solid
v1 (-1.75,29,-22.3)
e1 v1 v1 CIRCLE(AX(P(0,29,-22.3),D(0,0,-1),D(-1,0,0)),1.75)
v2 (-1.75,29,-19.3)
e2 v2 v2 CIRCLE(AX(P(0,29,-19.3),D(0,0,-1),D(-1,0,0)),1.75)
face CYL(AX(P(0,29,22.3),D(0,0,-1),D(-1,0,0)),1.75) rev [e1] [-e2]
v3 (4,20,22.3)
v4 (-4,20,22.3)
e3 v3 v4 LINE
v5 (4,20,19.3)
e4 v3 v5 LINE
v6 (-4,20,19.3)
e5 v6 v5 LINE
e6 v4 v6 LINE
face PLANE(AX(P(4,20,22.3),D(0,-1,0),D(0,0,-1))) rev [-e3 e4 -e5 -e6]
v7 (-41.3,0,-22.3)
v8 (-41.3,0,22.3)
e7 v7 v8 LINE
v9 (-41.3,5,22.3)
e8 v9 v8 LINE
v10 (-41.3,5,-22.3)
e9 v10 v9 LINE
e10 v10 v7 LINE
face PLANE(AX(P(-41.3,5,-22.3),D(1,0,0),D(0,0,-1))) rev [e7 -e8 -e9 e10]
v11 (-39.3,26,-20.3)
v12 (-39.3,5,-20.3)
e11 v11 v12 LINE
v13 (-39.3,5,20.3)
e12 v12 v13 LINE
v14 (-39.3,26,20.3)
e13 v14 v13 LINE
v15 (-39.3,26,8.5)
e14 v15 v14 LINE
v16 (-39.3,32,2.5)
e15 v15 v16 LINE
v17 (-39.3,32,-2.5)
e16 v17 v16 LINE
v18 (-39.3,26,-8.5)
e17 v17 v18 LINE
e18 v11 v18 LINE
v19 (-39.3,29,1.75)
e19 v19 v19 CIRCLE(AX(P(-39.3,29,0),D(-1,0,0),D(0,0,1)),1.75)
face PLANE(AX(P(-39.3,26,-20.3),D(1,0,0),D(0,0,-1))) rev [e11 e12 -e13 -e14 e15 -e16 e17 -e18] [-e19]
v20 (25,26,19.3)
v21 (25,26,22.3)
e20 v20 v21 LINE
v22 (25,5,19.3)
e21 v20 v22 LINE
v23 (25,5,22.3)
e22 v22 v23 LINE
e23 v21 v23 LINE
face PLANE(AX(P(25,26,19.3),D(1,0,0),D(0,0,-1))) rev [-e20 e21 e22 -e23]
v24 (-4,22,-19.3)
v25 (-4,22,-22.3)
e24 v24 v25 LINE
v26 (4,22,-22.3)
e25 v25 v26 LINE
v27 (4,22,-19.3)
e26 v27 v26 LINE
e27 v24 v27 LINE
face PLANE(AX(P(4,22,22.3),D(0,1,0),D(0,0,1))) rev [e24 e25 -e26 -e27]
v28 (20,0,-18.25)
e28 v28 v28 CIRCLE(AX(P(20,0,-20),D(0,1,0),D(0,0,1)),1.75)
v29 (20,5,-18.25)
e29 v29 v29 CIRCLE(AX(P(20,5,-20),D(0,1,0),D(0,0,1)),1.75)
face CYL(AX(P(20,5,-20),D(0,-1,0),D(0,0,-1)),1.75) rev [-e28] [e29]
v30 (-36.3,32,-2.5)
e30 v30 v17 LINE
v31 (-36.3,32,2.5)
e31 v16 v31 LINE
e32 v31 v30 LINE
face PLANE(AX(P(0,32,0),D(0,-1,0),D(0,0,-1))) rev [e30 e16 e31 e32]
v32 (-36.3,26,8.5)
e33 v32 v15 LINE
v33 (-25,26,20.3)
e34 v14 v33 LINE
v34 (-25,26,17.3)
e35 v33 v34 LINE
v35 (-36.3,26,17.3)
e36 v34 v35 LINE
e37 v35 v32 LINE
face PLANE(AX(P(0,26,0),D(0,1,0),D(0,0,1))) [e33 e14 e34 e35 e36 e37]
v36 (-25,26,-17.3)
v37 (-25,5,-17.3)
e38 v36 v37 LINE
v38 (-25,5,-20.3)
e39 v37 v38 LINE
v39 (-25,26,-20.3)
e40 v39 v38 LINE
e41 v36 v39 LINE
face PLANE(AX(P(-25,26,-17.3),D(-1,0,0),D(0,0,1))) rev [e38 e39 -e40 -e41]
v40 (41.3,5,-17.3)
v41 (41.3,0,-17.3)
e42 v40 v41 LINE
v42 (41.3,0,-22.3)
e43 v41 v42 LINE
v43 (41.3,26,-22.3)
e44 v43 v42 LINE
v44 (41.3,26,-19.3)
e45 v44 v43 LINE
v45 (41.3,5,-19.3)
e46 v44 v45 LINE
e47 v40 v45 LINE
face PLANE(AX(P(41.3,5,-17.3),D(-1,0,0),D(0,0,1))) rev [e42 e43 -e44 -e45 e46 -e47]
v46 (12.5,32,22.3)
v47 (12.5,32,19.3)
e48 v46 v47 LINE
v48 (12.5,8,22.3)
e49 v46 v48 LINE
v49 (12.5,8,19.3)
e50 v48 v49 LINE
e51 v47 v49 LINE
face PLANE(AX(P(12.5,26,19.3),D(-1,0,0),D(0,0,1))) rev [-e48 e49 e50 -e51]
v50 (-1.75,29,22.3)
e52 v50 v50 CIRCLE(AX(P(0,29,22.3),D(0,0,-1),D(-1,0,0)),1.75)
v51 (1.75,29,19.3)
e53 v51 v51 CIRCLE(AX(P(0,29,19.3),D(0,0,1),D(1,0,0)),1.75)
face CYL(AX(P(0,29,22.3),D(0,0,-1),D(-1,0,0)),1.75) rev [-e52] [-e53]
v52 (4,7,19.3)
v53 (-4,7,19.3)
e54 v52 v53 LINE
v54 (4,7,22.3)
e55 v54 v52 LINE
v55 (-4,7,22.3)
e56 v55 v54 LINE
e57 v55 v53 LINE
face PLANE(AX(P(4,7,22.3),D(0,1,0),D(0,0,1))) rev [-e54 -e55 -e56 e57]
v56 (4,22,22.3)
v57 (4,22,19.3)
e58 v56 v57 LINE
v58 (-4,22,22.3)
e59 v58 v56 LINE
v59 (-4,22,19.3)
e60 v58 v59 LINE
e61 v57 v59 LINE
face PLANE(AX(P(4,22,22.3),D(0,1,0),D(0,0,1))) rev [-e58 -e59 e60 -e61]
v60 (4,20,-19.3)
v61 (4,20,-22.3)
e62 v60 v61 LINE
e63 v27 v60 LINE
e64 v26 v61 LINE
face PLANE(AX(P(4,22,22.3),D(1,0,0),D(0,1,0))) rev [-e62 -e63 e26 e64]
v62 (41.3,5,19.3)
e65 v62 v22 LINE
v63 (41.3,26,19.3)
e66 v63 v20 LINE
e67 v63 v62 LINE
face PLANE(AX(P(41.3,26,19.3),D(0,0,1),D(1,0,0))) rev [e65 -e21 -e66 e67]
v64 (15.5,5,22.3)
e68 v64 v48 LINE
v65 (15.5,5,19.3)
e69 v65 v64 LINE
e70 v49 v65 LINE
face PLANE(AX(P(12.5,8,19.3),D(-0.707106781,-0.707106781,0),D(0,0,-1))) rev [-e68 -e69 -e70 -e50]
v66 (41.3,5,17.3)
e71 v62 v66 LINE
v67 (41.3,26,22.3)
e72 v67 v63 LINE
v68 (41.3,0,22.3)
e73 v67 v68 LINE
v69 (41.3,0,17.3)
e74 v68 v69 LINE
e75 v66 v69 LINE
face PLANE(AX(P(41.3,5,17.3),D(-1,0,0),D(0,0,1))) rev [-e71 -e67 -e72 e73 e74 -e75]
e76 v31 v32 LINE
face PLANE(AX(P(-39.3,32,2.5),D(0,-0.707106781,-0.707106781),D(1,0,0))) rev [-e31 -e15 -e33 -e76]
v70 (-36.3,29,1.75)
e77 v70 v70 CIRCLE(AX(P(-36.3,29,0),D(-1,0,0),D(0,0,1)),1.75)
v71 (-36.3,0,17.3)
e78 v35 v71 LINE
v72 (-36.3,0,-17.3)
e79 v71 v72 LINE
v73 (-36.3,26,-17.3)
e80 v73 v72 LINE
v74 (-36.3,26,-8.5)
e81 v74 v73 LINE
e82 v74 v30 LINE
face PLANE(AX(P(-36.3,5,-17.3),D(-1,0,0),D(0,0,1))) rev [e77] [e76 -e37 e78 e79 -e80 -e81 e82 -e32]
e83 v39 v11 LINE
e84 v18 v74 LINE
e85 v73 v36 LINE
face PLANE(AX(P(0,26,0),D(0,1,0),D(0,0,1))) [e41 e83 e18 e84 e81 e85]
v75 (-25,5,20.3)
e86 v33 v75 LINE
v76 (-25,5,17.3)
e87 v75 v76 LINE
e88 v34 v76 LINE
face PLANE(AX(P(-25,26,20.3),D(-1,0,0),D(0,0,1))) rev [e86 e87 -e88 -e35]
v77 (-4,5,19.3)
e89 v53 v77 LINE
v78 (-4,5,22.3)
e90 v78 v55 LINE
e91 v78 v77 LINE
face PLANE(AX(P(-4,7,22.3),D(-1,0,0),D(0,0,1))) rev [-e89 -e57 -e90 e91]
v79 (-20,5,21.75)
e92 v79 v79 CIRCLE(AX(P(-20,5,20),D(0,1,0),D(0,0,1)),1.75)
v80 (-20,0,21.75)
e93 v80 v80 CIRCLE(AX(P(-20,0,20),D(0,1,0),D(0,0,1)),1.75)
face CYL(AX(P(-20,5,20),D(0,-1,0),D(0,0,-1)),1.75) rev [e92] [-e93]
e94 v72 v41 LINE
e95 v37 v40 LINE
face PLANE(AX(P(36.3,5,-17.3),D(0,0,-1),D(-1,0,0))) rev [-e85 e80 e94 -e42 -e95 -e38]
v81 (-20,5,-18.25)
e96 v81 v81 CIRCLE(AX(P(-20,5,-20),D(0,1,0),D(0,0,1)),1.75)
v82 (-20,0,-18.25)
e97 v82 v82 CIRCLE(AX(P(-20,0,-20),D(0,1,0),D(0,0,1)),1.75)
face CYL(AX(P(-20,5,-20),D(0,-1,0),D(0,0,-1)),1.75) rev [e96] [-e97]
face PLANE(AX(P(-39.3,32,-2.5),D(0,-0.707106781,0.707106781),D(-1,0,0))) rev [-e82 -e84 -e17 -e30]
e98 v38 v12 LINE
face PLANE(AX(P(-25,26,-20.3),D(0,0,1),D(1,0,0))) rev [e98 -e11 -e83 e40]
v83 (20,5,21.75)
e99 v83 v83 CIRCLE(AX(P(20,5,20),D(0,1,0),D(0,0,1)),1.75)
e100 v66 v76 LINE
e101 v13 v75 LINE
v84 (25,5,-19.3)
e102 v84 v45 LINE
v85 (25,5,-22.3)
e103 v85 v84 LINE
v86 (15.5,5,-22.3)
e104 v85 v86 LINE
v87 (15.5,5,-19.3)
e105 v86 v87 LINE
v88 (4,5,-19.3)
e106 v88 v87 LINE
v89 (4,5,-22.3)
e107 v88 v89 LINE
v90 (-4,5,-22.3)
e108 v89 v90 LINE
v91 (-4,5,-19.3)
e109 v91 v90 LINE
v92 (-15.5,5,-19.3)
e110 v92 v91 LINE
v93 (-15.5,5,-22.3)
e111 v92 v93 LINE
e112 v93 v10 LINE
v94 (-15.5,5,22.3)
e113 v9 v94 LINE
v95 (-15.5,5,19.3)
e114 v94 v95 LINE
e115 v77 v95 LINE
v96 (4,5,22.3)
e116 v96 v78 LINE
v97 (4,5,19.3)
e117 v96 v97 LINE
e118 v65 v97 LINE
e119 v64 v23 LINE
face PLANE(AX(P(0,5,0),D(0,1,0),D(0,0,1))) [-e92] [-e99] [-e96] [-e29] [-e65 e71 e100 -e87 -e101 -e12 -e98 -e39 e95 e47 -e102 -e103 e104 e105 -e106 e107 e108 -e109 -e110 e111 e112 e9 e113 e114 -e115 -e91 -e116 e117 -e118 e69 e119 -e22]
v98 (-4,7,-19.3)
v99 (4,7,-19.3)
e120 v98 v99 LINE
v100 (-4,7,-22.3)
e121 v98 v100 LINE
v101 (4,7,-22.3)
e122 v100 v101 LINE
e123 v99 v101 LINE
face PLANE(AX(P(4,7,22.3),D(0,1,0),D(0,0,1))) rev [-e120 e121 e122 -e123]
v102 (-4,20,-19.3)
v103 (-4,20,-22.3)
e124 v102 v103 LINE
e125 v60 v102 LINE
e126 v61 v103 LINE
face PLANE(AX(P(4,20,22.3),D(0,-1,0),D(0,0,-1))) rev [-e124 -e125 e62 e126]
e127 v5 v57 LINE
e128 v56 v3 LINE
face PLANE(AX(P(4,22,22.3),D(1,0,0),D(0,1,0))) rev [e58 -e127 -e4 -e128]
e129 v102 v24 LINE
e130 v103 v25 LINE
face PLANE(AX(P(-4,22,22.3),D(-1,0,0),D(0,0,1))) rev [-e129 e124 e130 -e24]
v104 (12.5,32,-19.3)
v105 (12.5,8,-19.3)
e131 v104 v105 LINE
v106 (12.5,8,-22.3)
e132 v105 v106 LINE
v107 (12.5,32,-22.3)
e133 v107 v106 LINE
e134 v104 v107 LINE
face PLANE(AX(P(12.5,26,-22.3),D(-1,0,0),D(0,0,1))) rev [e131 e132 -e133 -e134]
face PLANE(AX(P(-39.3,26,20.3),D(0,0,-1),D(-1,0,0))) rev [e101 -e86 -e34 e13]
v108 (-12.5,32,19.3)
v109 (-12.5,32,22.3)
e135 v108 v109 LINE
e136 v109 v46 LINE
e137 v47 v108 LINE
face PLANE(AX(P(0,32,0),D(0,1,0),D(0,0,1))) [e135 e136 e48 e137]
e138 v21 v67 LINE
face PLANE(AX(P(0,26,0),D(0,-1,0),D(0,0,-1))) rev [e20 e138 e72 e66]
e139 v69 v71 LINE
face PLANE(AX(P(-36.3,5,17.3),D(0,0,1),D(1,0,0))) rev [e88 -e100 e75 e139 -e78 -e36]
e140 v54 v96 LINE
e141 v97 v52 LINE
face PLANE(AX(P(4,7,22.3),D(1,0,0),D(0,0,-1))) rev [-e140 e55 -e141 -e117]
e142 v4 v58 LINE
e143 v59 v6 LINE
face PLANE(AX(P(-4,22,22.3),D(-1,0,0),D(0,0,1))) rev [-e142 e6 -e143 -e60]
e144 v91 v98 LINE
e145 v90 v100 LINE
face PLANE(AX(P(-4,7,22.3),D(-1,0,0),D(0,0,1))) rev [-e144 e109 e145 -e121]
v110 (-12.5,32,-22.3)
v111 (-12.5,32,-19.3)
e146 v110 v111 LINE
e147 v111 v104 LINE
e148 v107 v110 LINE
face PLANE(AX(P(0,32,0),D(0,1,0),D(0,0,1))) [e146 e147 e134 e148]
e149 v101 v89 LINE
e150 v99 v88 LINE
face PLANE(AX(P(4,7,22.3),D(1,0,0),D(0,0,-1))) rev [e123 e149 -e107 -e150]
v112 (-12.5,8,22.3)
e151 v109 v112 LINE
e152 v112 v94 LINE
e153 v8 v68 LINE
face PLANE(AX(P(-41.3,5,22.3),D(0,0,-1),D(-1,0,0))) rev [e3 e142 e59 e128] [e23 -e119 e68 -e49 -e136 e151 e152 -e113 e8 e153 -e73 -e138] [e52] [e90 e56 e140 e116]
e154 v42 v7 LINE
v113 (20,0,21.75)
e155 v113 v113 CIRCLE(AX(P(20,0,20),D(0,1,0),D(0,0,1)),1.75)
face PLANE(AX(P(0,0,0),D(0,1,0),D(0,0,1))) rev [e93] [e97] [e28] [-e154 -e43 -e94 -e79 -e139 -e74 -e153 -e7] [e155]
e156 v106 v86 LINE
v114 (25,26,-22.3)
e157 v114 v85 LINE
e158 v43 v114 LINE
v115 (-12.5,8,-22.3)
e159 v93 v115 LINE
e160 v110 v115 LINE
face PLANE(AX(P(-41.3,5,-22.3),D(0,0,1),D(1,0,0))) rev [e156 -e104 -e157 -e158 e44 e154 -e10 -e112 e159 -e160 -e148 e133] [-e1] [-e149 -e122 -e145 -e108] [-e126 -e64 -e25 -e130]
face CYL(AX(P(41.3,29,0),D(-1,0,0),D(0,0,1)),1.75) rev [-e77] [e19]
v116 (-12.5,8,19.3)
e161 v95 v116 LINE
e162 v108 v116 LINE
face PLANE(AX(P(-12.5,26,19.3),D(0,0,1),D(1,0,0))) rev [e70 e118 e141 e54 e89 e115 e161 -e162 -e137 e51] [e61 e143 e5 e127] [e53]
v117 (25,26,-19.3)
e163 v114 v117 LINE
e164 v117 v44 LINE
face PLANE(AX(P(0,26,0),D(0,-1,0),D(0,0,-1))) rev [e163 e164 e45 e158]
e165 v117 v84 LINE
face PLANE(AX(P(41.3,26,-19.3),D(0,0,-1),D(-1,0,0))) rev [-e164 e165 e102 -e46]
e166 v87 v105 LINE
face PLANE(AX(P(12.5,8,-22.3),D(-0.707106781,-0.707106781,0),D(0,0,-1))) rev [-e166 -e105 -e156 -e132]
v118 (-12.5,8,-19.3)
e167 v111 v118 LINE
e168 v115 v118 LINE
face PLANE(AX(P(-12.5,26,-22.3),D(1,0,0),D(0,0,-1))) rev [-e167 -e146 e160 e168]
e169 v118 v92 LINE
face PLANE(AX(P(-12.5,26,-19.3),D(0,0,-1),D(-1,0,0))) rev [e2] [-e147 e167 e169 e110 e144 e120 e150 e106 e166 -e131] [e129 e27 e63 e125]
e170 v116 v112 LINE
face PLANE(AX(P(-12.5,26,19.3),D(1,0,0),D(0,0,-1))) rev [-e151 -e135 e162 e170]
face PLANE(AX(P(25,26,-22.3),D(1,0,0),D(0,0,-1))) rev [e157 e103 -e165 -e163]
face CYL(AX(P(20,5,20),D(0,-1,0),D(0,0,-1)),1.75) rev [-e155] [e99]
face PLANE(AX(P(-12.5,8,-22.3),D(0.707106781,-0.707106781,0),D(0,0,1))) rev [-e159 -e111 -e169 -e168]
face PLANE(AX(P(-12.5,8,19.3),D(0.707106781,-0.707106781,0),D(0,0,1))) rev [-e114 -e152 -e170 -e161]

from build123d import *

# Parameters (mm, degrees)
CROQUIS1_R              = 1.75
SALIENTE_EXTRUIR1_DEPTH = 5
CROQUIS2_W              = 25
CROQUIS2_H              = 3
CROQUIS2_W_2            = 16.3
SALIENTE_EXTRUIR2_DEPTH = 21
CROQUIS4_W              = 3
CROQUIS4_H              = 5
SALIENTE_EXTRUIR3_DEPTH = 6
CROQUIS5_R              = 1.75
CORTAR_EXTRUIR2_DEPTH   = 90.541331239
CHAFL_N1_SIZE           = 6
CROQUIS6_W              = 25
CROQUIS6_H              = 3
SALIENTE_EXTRUIR4_DEPTH = 6
CROQUIS7_R              = 1.75
CROQUIS7_W              = 8
CROQUIS7_H              = 2
CORTAR_EXTRUIR3_DEPTH   = 69.693886191
CHAFL_N2_SIZE           = 3


with BuildPart() as part:
    # Croquis1 → Saliente-Extruir1 (new body)
    with BuildSketch(Plane(origin=(0, 0, 0), x_dir=(1, 0, 0), z_dir=(0, 1, 0))):
        Polygon((-36.3, 17.3), (36.3, 17.3), (41.3, 17.3), (41.3, 22.3), (-41.3, 22.3), (-41.3, -22.3), (41.3, -22.3), (41.3, -17.3), (36.3, -17.3), (-36.3, -17.3), align=None)
        with Locations(Location((-20, 20, 0), (0, 0, 270))):
            Circle(CROQUIS1_R, mode=Mode.SUBTRACT)
        with Locations(Location((20, 20, 0), (0, 0, 270))):
            Circle(CROQUIS1_R, mode=Mode.SUBTRACT)
        with Locations(Location((-20, -20, 0), (0, 0, 270))):
            Circle(CROQUIS1_R, mode=Mode.SUBTRACT)
        with Locations(Location((20, -20, 0), (0, 0, 270))):
            Circle(CROQUIS1_R, mode=Mode.SUBTRACT)
    extrude(amount=SALIENTE_EXTRUIR1_DEPTH)

    # Croquis2 → Saliente-Extruir2 (add)
    with BuildSketch(Plane(origin=(0, 5, 0), x_dir=(1, 0, 0), z_dir=(0, 1, 0))):
        Polygon((-39.3, 20.3), (-39.3, -20.3), (-25, -20.3), (-25, -17.3), (-36.3, -17.3), (-36.3, 17.3), (-25, 17.3), (-25, 20.3), align=None)
        with Locations((0, -20.8)):
            Rectangle(CROQUIS2_W, CROQUIS2_H)
        with Locations((0, 20.8)):
            Rectangle(CROQUIS2_W, CROQUIS2_H)
        with Locations((33.15, -20.8)):
            Rectangle(CROQUIS2_W_2, CROQUIS2_H)
        with Locations((33.15, 20.8)):
            Rectangle(CROQUIS2_W_2, CROQUIS2_H)
    extrude(amount=SALIENTE_EXTRUIR2_DEPTH)

    # Croquis4 → Saliente-Extruir3 (add)
    with BuildSketch(Plane(origin=(0, 26, 0), x_dir=(1, 0, 0), z_dir=(0, 1, 0))):
        with Locations((-37.8, 0)):
            Rectangle(CROQUIS4_W, CROQUIS4_H)
    extrude(amount=SALIENTE_EXTRUIR3_DEPTH)

    # Croquis5 → Cortar-Extruir2 (cut, through all)
    with BuildSketch(Plane.ZY.offset(39.3)):
        with Locations((0, 29)):
            Circle(CROQUIS5_R)
    extrude(amount=-CORTAR_EXTRUIR2_DEPTH, mode=Mode.SUBTRACT)

    # Chaflán1
    chafl_n1_edges = [part.edges().sort_by_distance(p)[0] for p in [
        (-37.8, 26, 2.5),
        (-37.8, 26, -2.5),
    ]]
    chamfer(chafl_n1_edges, length=CHAFL_N1_SIZE - 0.0001)  # a hair under: the kernel refuses the full size

    # Croquis6 → Saliente-Extruir4 (add)
    with BuildSketch(Plane(origin=(0, 26, 0), x_dir=(1, 0, 0), z_dir=(0, 1, 0))):
        with Locations((0, 20.8)):
            Rectangle(CROQUIS6_W, CROQUIS6_H)
        with Locations((0, -20.8)):
            Rectangle(CROQUIS6_W, CROQUIS6_H)
    extrude(amount=SALIENTE_EXTRUIR4_DEPTH)

    # Croquis7 → Cortar-Extruir3 (cut, through all)
    with BuildSketch(Plane(origin=(0, 0, -22.3), x_dir=(-1, 0, 0), z_dir=(0, 0, -1))):
        with Locations((0, 29)):
            Circle(CROQUIS7_R)
        with Locations((0, 21)):
            Rectangle(CROQUIS7_W, CROQUIS7_H)
        with Locations((0, 6)):
            Rectangle(CROQUIS7_W, CROQUIS7_H)
    extrude(amount=-CORTAR_EXTRUIR3_DEPTH, mode=Mode.SUBTRACT)

    # Chaflán2
    chafl_n2_edges = [part.edges().sort_by_distance(p)[0] for p in [
        (-12.5, 5, 20.8),
        (12.5, 5, 20.8),
        (-12.5, 5, -20.8),
        (12.5, 5, -20.8),
    ]]
    chamfer(chafl_n2_edges, length=CHAFL_N2_SIZE)


solid = part.part
